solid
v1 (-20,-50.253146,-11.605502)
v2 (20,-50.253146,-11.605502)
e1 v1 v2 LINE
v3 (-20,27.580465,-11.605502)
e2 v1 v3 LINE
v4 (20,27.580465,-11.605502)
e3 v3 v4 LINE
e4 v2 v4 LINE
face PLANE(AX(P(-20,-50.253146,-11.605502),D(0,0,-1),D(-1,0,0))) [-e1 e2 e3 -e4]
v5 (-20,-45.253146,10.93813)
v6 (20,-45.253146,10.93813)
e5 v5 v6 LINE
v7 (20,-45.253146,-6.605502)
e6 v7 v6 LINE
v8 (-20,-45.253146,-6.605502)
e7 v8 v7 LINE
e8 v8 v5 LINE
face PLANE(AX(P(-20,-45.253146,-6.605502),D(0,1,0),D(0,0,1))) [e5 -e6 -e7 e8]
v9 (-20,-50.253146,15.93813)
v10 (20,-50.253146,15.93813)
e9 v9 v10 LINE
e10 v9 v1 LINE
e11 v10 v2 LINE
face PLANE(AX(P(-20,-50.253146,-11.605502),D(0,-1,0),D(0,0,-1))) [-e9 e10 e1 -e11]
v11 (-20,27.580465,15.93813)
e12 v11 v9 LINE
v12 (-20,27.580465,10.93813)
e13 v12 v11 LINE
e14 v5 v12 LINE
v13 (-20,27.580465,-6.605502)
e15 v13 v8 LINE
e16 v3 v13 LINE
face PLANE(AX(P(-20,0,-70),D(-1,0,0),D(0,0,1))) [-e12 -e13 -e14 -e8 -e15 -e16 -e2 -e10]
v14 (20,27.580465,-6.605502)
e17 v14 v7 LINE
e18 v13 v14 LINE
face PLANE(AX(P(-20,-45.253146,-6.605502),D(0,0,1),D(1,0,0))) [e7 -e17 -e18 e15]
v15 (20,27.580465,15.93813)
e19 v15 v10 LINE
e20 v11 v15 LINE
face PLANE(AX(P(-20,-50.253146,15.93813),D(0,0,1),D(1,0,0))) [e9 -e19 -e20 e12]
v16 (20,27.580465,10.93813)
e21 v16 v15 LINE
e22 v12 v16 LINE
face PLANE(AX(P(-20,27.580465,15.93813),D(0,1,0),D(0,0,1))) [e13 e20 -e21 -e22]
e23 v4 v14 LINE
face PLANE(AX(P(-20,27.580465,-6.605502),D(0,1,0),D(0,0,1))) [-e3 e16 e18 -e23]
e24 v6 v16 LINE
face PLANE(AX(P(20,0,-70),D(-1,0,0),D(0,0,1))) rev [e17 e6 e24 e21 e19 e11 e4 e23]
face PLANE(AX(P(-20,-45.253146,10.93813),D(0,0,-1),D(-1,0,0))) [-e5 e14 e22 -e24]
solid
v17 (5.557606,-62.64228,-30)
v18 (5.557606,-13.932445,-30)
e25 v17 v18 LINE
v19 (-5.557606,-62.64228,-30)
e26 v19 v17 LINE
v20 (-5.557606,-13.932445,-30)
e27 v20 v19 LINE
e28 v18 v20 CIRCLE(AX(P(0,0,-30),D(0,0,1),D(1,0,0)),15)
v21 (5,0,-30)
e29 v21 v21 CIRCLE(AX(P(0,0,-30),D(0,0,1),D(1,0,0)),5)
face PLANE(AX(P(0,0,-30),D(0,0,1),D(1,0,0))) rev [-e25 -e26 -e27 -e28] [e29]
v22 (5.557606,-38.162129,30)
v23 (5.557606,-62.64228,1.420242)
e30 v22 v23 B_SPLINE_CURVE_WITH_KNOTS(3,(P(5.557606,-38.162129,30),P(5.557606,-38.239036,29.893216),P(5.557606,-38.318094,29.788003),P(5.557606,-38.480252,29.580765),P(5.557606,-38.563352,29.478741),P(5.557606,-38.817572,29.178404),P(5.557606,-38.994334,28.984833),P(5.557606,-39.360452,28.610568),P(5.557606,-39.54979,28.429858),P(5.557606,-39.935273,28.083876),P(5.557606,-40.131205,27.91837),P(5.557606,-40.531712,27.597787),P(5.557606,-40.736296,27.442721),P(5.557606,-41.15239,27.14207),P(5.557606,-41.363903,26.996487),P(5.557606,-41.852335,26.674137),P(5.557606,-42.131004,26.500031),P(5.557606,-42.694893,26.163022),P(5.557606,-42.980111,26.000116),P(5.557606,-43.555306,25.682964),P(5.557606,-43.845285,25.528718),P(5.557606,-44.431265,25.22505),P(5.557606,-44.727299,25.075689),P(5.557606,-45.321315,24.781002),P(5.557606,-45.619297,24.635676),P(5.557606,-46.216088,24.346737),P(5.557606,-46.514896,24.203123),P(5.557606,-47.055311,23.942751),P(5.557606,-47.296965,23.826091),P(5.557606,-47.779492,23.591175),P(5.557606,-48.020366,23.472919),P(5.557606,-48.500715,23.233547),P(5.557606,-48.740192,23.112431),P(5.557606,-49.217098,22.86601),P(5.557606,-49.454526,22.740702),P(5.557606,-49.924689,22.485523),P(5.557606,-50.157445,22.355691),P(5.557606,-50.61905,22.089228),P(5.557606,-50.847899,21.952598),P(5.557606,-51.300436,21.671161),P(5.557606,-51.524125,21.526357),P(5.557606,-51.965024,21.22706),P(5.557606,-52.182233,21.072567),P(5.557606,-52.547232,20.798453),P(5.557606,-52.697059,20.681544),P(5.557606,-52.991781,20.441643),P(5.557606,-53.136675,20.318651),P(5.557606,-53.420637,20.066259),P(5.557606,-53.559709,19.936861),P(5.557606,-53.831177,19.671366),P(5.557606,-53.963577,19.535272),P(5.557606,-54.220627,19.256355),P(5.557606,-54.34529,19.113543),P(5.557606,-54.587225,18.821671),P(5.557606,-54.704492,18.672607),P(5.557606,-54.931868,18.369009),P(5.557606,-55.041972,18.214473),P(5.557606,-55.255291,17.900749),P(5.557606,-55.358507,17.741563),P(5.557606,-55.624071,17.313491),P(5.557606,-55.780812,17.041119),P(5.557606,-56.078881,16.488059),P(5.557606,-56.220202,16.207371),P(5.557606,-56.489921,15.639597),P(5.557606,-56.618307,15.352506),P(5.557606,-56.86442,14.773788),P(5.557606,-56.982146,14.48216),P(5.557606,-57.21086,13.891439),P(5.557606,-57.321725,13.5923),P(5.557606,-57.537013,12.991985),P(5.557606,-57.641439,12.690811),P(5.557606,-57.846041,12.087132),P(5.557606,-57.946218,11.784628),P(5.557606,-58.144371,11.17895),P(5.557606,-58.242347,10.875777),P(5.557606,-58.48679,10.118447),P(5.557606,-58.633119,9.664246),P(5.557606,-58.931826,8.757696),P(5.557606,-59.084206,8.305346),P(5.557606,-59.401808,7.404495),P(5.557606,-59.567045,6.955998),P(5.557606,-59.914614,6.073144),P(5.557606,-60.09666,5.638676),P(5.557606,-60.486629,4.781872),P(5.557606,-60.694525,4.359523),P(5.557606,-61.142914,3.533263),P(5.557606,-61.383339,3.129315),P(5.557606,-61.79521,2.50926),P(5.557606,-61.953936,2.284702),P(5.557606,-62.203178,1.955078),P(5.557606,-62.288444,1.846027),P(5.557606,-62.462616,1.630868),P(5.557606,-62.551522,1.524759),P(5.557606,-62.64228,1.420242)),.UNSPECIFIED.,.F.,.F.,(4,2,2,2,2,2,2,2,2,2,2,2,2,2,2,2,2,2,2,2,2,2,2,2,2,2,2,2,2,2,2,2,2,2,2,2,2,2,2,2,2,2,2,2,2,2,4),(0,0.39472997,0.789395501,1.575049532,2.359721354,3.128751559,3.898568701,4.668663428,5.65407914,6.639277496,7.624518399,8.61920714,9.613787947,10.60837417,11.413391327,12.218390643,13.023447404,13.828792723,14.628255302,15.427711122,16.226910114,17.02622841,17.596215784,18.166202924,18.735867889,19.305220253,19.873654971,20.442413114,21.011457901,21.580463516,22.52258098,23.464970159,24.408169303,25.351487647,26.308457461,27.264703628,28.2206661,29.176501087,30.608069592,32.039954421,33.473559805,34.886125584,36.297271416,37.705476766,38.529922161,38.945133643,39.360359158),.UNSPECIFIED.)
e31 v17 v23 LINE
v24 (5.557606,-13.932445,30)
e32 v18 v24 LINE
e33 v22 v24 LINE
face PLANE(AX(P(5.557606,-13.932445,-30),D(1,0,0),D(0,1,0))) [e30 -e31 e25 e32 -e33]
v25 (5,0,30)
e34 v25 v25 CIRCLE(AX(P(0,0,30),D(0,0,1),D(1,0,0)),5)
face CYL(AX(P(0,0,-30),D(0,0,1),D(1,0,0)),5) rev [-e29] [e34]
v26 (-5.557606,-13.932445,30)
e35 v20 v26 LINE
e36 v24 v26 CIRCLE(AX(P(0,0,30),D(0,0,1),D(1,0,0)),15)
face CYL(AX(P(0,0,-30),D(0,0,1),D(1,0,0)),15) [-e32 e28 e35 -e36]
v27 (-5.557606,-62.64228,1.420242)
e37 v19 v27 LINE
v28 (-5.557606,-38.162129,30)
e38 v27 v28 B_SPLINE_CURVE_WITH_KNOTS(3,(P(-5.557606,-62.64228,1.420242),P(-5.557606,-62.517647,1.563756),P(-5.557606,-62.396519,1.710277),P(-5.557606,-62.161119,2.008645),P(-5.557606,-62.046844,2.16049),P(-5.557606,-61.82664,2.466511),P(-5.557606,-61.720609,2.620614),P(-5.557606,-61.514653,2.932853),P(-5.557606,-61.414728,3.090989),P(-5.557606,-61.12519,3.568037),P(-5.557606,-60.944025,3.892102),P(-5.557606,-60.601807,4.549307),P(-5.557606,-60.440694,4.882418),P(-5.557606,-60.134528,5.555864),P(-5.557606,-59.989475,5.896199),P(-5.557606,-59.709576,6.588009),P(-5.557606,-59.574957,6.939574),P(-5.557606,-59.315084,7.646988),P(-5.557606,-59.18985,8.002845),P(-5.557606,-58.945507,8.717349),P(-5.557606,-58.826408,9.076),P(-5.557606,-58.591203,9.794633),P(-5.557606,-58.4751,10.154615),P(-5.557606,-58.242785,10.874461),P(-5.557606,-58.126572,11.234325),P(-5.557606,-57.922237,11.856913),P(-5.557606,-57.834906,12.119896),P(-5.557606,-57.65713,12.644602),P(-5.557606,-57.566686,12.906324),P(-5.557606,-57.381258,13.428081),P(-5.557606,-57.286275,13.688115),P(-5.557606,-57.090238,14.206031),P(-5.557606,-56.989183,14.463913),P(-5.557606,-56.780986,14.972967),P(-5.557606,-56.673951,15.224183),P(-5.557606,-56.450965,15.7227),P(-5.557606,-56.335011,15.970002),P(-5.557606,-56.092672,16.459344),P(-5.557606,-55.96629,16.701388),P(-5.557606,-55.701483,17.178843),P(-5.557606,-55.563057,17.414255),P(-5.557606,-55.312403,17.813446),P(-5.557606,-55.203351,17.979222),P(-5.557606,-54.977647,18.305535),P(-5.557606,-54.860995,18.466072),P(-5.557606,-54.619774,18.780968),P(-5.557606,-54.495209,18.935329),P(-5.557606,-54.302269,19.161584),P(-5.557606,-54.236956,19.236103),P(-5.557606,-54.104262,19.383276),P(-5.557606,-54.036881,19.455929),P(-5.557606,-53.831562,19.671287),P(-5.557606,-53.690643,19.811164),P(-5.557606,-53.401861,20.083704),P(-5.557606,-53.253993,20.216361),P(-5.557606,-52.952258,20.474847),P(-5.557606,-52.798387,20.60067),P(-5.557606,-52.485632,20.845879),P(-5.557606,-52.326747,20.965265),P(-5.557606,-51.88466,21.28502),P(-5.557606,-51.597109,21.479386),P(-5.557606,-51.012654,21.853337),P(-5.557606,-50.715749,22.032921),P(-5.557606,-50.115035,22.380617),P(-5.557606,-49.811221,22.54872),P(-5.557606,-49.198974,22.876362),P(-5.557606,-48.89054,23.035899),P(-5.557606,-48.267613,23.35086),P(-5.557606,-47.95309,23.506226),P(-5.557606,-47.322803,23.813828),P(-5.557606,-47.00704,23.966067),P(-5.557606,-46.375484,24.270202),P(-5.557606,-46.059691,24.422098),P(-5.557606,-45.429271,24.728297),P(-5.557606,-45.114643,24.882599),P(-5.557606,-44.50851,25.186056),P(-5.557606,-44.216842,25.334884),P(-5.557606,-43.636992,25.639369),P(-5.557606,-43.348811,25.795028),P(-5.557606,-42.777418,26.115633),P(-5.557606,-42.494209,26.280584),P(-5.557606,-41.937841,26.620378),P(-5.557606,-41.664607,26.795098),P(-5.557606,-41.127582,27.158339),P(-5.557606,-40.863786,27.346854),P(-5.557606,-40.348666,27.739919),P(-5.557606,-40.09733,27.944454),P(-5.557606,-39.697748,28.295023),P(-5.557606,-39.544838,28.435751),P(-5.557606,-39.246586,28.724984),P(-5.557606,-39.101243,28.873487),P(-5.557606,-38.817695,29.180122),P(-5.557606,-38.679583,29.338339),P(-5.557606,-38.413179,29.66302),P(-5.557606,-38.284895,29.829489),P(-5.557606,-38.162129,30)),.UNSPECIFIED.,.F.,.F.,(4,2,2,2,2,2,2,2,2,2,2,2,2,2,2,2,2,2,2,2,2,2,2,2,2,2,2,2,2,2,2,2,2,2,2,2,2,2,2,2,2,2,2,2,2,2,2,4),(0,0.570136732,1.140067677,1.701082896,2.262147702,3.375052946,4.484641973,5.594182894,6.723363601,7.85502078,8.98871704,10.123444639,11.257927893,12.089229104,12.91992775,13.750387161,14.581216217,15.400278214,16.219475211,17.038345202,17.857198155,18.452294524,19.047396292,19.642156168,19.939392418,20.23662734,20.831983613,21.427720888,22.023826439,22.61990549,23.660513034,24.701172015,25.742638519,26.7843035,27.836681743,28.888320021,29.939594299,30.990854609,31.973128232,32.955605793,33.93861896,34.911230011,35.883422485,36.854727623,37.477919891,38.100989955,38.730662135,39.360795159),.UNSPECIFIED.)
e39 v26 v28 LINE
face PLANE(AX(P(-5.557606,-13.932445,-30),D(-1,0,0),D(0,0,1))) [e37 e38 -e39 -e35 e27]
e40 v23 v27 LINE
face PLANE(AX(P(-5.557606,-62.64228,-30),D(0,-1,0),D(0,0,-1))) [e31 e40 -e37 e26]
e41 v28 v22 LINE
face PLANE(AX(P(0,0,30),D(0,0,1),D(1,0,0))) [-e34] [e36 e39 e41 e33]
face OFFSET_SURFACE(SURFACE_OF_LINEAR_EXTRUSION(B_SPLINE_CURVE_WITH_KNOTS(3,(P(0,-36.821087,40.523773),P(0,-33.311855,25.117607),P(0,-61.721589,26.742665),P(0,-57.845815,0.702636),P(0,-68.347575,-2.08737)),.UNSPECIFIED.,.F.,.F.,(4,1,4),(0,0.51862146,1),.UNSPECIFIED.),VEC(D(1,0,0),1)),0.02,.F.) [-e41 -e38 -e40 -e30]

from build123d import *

# Parameters (mm, degrees)
EXTRUDE_5_DEPTH      = 30
EXTRUDE_5_DEPTH_BACK = 30
F_1_FR_R             = 5
EXTRUDE_6_DEPTH      = 20
EXTRUDE_6_DEPTH_BACK = 20
OTHER_START          = -5.557606452
OTHER_2_DEPTH        = 11.115212904


# Read off the part's stored shape, not the designer's step: Отступ2
with BuildPart() as part:
    # Эскиз1_fr → Бобышка-Вытянуть5 (new, two sides: drawn at the far end of the back side and taken through both)
    with BuildSketch(Plane.XY.offset(-EXTRUDE_5_DEPTH_BACK)):
        with BuildLine():
            Line((-5.557606452, -13.932444528), (-5.557606452, -62.642280008))
            Line((-5.557606452, -62.642280008), (5.557606452, -62.642280008))
            Line((5.557606452, -62.642280008), (5.557606452, -13.932444528))
            ThreePointArc((5.557606452, -13.932444528), (0, 15), (-5.557606452, -13.932444528))
        make_face()
        Circle(F_1_FR_R, mode=Mode.SUBTRACT)
    extrude(amount=EXTRUDE_5_DEPTH + EXTRUDE_5_DEPTH_BACK)

    # Отступ2 outline → Отступ2 (cut)
    with BuildSketch(Plane.YZ.offset(OTHER_START)):
        with BuildLine():
            add(Edge.make_bspline(
                [(-38.162129208, 30.000000201), (-38.350412386, 29.738589195), (-38.547242858, 29.484853366), (-38.752299072, 29.238505312), (-38.965259498, 28.99925828), (-39.185802485, 28.766826159), (-39.413606123, 28.540923423), (-39.64834813, 28.32126501), (-39.889705768, 28.107566173), (-40.137355811, 27.899542297), (-40.39097457, 27.696908743), (-40.650238001, 27.499380765), (-40.914821881, 27.306673579), (-41.184402075, 27.11850268), (-42.265778691, 26.393314992), (-43.113368902, 25.888872388), (-43.99315142, 25.414009108), (-44.896841535, 24.96146191), (-45.816149017, 24.523958449), (-46.742782565, 24.094220219), (-47.668453227, 23.664962906), (-48.584876381, 23.228895124), (-49.483771918, 22.778716473), (-50.356862203, 22.30711592), (-51.195867455, 21.806771428), (-51.992498133, 21.270351842), (-52.73844395, 20.690521946), (-53.511223517, 19.981130426), (-53.596170911, 19.901516083), (-53.680123568, 19.821092243), (-53.763413941, 19.739889031), (-53.844744398, 19.657606996), (-53.927459143, 19.575304006), (-54.004978314, 19.490233908), (-54.086963112, 19.407352212), (-54.162711198, 19.320126258), (-54.240798044, 19.234583034), (-54.316342943, 19.146873901), (-54.391361142, 19.058753339), (-54.465300564, 18.969694587), (-54.611255963, 18.789935065), (-54.683262919, 18.699224485), (-54.754314107, 18.607695324), (-54.824424506, 18.515359819), (-54.893609092, 18.422230207), (-54.961882842, 18.328318725), (-55.029260732, 18.233637612), (-55.095757741, 18.138199104), (-55.161388843, 18.042015438), (-55.226169019, 17.945098853), (-55.290113242, 17.847461585), (-55.353236491, 17.749115872), (-55.415553743, 17.650073952), (-55.600132437, 17.350896278), (-55.720020886, 17.148708437), (-55.836865309, 16.943882089), (-55.950785669, 16.736514739), (-56.061901911, 16.526703843), (-56.170333957, 16.31454681), (-56.276201707, 16.100141), (-56.379625042, 15.883583727), (-56.480723817, 15.664972254), (-56.579617872, 15.444403799), (-56.676427019, 15.221975529), (-56.771271052, 14.997784566), (-56.864269745, 14.771927983), (-57.138089051, 14.089652446), (-57.313732951, 13.628528404), (-57.48343208, 13.161907014), (-57.648143574, 12.690564713), (-57.808824172, 12.215278032), (-57.966430218, 11.736823601), (-58.121917654, 11.255978148), (-58.276242029, 10.773518498), (-58.430358494, 10.290221572), (-58.585221804, 9.806864391), (-58.741786314, 9.324224071), (-58.901005985, 8.843077827), (-59.063834379, 8.364202972), (-59.410471901, 7.378846098), (-59.594949774, 6.872811052), (-59.785830162, 6.371227061), (-59.984282319, 5.875048562), (-60.19147505, 5.385229705), (-60.408577178, 4.902724584), (-60.636757277, 4.428487146), (-60.877183329, 3.963470844), (-61.131022629, 3.508628159), (-61.399442059, 3.064910118), (-61.683608675, 2.633265954), (-61.984690452, 2.214643016), (-62.303856996, 1.809986968), (-62.642280061, 1.420242276)],
                knots=[0.165052435, 0.165052435, 0.165052435, 0.165052435, 0.165052435, 0.165052435, 0.165052435, 0.165052435, 0.165052435, 0.165052435, 0.165052435, 0.165052435, 0.165052435, 0.165052435, 0.165052435, 0.25, 0.25, 0.25, 0.25, 0.25, 0.25, 0.25, 0.25, 0.25, 0.25, 0.25, 0.25, 0.25, 0.5, 0.5, 0.5, 0.5, 0.5, 0.5, 0.5, 0.5, 0.5, 0.5, 0.5, 0.5, 0.5, 0.53125, 0.53125, 0.53125, 0.53125, 0.53125, 0.53125, 0.53125, 0.53125, 0.53125, 0.53125, 0.53125, 0.53125, 0.53125, 0.5625, 0.5625, 0.5625, 0.5625, 0.5625, 0.5625, 0.5625, 0.5625, 0.5625, 0.5625, 0.5625, 0.5625, 0.5625, 0.625, 0.625, 0.625, 0.625, 0.625, 0.625, 0.625, 0.625, 0.625, 0.625, 0.625, 0.625, 0.625, 0.75, 0.75, 0.75, 0.75, 0.75, 0.75, 0.75, 0.75, 0.75, 0.75, 0.75, 0.75, 0.75, 0.883854275, 0.883854275, 0.883854275, 0.883854275, 0.883854275, 0.883854275, 0.883854275, 0.883854275, 0.883854275, 0.883854275, 0.883854275, 0.883854275, 0.883854275, 0.883854275, 0.883854275], degree=14))
            Line((-38.162129208, 30.000000201), (-62.642280008, 30))
            Line((-62.642280008, 30), (-62.642280061, 1.420242276))
        make_face()
    extrude(amount=OTHER_2_DEPTH, mode=Mode.SUBTRACT)


with BuildPart() as body_2:
    # Эскиз3 → Бобышка-Вытянуть6 (new, two sides: drawn at the far end of the back side and taken through both)
    with BuildSketch(Plane(origin=(0, 0, 0), x_dir=(0, 0, -1), z_dir=(1, 0, 0)).offset(-EXTRUDE_6_DEPTH_BACK)):
        Polygon((-58.394498043, -50.25314581), (-85.938130262, -50.25314581), (-85.938130262, 27.580465306), (-80.938130262, 27.580465306), (-80.938130262, -45.25314581), (-63.394498043, -45.25314581), (-63.394498043, 27.580465306), (-58.394498043, 27.580465306), align=None)
    extrude(amount=EXTRUDE_6_DEPTH + EXTRUDE_6_DEPTH_BACK)


with BuildPart() as body_2_1:
    # Move Body 1: moved
    add(body_2.part.moved(Location((0, 0, -70))))


solid = Compound([part.part, body_2_1.part])
